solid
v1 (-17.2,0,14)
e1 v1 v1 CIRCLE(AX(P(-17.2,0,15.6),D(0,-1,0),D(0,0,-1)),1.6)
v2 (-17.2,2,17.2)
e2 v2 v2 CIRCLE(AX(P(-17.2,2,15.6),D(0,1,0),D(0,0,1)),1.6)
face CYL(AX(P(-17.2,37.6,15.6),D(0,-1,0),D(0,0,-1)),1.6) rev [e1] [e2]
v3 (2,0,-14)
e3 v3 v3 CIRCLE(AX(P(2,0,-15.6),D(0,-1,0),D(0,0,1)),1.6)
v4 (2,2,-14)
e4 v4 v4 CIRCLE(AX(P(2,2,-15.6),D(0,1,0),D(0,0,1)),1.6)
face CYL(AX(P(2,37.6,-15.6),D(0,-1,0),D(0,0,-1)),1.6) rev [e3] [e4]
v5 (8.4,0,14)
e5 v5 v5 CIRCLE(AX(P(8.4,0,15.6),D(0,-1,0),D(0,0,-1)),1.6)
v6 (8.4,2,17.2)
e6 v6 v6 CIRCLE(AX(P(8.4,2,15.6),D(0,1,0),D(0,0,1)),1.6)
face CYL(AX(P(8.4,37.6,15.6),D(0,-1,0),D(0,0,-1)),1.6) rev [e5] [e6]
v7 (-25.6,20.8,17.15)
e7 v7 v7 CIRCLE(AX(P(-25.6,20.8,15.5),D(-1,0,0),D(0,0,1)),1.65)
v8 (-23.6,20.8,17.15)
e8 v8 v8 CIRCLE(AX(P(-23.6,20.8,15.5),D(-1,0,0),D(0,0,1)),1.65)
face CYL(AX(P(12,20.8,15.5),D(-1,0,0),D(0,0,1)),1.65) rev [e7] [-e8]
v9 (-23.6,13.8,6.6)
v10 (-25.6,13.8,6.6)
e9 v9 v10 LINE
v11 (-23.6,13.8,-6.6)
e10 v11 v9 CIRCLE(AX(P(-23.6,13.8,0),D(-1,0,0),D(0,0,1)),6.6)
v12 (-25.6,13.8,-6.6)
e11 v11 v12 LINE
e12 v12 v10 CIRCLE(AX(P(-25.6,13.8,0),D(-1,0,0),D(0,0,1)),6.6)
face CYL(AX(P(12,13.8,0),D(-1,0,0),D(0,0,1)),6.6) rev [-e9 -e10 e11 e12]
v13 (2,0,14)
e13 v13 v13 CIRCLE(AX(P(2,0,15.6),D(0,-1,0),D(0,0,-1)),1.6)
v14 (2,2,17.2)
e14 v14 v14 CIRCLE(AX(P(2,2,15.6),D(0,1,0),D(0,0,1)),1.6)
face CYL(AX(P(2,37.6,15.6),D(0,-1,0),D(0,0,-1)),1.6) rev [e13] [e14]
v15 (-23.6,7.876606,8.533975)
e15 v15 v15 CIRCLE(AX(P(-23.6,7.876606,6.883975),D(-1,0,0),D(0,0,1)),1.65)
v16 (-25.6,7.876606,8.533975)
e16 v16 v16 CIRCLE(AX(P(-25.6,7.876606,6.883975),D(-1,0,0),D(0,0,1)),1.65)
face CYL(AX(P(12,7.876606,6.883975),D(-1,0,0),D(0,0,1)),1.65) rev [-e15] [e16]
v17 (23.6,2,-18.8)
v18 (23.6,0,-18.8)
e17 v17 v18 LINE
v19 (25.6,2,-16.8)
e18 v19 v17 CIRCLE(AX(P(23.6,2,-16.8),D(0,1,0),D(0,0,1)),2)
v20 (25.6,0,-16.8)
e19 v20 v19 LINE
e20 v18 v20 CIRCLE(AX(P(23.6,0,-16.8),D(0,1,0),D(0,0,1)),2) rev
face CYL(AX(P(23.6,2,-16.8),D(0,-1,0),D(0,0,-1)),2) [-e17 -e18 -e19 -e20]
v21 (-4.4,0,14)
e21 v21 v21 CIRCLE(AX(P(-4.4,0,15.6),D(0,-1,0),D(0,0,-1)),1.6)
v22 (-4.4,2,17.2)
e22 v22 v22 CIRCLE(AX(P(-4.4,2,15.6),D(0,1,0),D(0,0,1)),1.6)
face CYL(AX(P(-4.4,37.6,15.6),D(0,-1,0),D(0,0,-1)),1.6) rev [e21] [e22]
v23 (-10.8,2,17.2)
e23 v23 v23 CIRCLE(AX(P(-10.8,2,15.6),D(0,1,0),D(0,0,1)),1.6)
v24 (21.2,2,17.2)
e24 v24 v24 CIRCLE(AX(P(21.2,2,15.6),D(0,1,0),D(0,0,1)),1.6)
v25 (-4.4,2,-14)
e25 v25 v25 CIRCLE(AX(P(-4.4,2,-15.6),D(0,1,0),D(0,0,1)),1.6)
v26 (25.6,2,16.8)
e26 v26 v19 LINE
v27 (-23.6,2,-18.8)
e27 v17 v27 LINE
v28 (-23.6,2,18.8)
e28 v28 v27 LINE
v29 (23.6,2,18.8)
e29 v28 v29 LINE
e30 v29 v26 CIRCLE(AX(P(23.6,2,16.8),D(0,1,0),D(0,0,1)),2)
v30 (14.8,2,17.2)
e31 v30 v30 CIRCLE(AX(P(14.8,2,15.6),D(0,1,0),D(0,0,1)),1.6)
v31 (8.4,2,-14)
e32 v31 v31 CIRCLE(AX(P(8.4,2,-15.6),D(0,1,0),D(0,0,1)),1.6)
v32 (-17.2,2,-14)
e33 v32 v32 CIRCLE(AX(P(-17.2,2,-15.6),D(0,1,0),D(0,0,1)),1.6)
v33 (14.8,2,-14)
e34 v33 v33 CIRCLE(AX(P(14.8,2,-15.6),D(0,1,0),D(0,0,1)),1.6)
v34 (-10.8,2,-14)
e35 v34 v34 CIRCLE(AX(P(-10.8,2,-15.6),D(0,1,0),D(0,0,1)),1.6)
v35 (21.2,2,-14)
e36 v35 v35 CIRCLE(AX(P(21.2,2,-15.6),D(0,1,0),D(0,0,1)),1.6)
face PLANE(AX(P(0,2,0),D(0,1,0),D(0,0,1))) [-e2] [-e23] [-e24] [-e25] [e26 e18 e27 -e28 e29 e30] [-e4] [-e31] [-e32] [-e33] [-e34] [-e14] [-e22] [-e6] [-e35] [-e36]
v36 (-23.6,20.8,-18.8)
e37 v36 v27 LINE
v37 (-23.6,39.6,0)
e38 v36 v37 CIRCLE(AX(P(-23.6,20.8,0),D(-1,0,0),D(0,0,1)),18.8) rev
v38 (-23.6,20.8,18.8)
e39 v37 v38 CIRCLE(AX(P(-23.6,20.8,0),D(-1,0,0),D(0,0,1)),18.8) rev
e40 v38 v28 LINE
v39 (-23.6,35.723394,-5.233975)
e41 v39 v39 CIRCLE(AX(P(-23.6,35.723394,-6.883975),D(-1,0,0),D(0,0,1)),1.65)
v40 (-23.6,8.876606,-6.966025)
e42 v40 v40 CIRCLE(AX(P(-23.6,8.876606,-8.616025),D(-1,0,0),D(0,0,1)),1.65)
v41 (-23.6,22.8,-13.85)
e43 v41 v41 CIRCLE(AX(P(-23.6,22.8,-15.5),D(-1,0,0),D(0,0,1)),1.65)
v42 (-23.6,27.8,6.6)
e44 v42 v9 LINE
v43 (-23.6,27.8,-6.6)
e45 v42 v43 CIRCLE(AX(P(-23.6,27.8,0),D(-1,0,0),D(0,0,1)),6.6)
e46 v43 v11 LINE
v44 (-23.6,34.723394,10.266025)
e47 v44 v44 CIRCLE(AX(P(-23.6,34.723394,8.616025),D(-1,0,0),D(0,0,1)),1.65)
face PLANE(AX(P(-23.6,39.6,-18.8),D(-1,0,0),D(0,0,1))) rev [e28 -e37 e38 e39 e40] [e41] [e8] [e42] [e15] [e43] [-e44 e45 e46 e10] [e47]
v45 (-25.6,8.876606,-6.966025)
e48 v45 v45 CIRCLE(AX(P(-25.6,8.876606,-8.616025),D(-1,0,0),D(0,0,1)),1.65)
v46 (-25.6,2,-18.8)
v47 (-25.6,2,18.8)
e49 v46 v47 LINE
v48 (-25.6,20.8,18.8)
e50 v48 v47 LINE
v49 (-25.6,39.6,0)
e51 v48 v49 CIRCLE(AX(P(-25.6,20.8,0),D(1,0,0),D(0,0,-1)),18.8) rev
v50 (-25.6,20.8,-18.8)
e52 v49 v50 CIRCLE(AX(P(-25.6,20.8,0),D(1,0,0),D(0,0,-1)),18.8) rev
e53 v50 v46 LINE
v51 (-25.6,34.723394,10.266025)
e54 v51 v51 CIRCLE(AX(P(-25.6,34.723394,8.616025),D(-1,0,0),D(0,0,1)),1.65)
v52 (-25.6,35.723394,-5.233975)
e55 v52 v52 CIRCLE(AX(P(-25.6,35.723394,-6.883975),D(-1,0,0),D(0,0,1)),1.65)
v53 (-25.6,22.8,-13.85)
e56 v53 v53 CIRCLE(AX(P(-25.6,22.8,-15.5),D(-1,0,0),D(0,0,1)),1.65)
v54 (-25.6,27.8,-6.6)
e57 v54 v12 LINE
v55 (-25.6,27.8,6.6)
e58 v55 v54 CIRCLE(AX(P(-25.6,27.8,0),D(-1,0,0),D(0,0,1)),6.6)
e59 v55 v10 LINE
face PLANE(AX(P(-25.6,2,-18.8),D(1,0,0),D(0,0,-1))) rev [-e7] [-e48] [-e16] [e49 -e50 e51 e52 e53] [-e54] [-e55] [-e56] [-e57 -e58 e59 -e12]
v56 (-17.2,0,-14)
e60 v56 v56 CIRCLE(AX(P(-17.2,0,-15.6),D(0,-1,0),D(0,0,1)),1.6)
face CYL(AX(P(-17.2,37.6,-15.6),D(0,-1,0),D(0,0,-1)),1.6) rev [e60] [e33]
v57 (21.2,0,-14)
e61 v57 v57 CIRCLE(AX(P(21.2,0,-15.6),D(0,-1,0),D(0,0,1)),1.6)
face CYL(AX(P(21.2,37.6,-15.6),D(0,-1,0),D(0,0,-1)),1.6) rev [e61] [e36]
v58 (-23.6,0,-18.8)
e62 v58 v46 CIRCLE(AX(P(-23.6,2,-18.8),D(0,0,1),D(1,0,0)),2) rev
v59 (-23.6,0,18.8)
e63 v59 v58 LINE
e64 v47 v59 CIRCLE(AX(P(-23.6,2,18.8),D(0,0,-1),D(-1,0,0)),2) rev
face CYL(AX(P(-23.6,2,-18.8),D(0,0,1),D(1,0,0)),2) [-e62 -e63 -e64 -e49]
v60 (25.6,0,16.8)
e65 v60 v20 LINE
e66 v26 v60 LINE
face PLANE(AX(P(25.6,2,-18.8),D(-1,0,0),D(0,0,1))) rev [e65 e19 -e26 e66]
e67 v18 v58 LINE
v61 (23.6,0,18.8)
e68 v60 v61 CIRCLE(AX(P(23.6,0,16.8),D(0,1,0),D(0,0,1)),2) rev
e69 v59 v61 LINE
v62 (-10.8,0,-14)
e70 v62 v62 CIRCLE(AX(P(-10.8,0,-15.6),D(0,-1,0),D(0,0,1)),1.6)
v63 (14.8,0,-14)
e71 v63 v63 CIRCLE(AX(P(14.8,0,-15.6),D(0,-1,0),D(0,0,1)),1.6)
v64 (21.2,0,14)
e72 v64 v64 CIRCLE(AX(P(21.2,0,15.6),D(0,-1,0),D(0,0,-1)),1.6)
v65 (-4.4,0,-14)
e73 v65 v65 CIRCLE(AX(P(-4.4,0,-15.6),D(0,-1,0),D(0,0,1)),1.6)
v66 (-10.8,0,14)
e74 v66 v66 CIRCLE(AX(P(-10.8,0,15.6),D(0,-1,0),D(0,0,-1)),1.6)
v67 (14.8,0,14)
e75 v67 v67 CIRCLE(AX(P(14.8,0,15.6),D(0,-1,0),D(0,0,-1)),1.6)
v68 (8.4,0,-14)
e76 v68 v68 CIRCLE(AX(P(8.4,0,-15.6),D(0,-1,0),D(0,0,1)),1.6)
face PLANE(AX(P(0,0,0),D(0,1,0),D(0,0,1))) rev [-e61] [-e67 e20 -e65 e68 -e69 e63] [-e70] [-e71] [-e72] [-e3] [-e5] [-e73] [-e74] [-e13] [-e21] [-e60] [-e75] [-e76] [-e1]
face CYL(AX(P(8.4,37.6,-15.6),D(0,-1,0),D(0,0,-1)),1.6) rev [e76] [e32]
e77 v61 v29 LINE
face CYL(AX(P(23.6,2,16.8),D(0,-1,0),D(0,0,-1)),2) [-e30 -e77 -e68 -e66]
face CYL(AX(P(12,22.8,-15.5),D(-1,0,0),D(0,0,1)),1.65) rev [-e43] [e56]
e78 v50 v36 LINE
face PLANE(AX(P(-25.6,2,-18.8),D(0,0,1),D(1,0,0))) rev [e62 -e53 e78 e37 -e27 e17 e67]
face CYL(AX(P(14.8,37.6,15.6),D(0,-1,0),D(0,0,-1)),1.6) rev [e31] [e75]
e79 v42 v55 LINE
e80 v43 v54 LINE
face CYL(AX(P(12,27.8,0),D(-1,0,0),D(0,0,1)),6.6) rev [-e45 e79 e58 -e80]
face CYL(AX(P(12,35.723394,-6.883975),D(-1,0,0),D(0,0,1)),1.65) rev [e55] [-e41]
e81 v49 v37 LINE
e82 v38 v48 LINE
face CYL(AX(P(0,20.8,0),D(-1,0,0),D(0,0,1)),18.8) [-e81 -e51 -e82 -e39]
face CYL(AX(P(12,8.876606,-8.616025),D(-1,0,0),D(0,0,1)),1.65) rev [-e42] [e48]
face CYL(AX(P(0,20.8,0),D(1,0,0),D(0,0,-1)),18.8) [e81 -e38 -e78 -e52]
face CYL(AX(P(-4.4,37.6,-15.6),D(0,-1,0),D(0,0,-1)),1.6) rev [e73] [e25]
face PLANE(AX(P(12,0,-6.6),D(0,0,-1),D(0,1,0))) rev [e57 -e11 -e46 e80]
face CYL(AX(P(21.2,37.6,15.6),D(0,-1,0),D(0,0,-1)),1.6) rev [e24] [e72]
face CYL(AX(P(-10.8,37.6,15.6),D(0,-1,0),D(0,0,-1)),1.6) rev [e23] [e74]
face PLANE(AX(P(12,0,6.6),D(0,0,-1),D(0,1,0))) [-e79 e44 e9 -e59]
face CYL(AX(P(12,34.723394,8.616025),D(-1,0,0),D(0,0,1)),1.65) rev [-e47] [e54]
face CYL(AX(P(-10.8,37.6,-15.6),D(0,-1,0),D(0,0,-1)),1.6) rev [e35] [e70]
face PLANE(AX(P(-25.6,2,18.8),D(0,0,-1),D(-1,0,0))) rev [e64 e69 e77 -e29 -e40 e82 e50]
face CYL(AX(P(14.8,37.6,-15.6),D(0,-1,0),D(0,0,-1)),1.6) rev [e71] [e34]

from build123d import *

# Parameters (mm, degrees)
SKETCH1_W           = 51.2
SKETCH1_H           = 37.6
BOSS_EXTRUDE1_DEPTH = 2
SKETCH2_W           = 2
SKETCH2_H           = 37.6
BOSS_EXTRUDE2_DEPTH = 37.6
SKETCH3_R           = 1.65
CUT_EXTRUDE2_DEPTH  = 37.6
SKETCH5_R           = 6.6
CUT_EXTRUDE3_DEPTH  = 37.6
SKETCH6_R           = 1.6
CUT_EXTRUDE4_DEPTH  = 37.6
FILLET1_R           = 2
FILLET2_R           = 2
FILLET3_R           = 18.8


with BuildPart() as part:
    # Sketch1 → Boss-Extrude1 (new body)
    with BuildSketch(Plane(origin=(0, 0, 0), x_dir=(1, 0, 0), z_dir=(0, 1, 0))):
        Rectangle(SKETCH1_W, SKETCH1_H)
    extrude(amount=BOSS_EXTRUDE1_DEPTH)

    # Sketch2 → Boss-Extrude2 (add)
    with BuildSketch(Plane(origin=(0, 2, 0), x_dir=(1, 0, 0), z_dir=(0, 1, 0))):
        with Locations((-24.6, 0)):
            Rectangle(SKETCH2_W, SKETCH2_H)
    extrude(amount=BOSS_EXTRUDE2_DEPTH)

    # Sketch3 → Cut-Extrude2 (cut)
    with BuildSketch(Plane.ZY.offset(25.6)):
        with Locations((15.5, 20.8)):
            Circle(SKETCH3_R)
        with Locations((6.883974596, 7.876606241)):
            Circle(SKETCH3_R)
        with Locations((-8.616025404, 8.876606241)):
            Circle(SKETCH3_R)
        with Locations((-15.5, 22.8)):
            Circle(SKETCH3_R)
        with Locations((-6.883974596, 35.723393759)):
            Circle(SKETCH3_R)
        with Locations((8.616025404, 34.723393759)):
            Circle(SKETCH3_R)
    extrude(amount=-CUT_EXTRUDE2_DEPTH, mode=Mode.SUBTRACT)

    # Sketch5 → Cut-Extrude3 (cut)
    with BuildSketch(Plane.ZY.offset(25.6)):
        with Locations((0, 27.8)):
            Circle(SKETCH5_R)
        with BuildLine():
            Line((6.6, 13.8), (6.6, 27.8))
            ThreePointArc((6.6, 27.8), (0, 21.2), (-6.6, 27.8))
            Line((-6.6, 27.8), (-6.6, 13.8))
            ThreePointArc((-6.6, 13.8), (0, 20.4), (6.6, 13.8))
        make_face()
        with Locations((0, 13.8)):
            Circle(SKETCH5_R)
    extrude(amount=-CUT_EXTRUDE3_DEPTH, mode=Mode.SUBTRACT)

    # Sketch6 → Cut-Extrude4 (cut)
    with BuildSketch(Plane(origin=(0, 0, 0), x_dir=(-1, 0, 0), z_dir=(0, -1, 0))):
        with Locations(Location((17.2, -15.6, 0), (0, 0, 90))):
            Circle(SKETCH6_R)
        with Locations(Location((10.8, -15.6, 0), (0, 0, 90))):
            Circle(SKETCH6_R)
        with Locations(Location((4.4, -15.6, 0), (0, 0, 90))):
            Circle(SKETCH6_R)
        with Locations(Location((-2, -15.6, 0), (0, 0, 90))):
            Circle(SKETCH6_R)
        with Locations(Location((-8.4, -15.6, 0), (0, 0, 90))):
            Circle(SKETCH6_R)
        with Locations(Location((-14.8, -15.6, 0), (0, 0, 90))):
            Circle(SKETCH6_R)
        with Locations(Location((-21.2, -15.6, 0), (0, 0, 90))):
            Circle(SKETCH6_R)
        with Locations(Location((-21.2, 15.6, 0), (0, 0, 270))):
            Circle(SKETCH6_R)
        with Locations(Location((-14.8, 15.6, 0), (0, 0, 270))):
            Circle(SKETCH6_R)
        with Locations(Location((-8.4, 15.6, 0), (0, 0, 270))):
            Circle(SKETCH6_R)
        with Locations(Location((-2, 15.6, 0), (0, 0, 270))):
            Circle(SKETCH6_R)
        with Locations(Location((4.4, 15.6, 0), (0, 0, 270))):
            Circle(SKETCH6_R)
        with Locations(Location((10.8, 15.6, 0), (0, 0, 270))):
            Circle(SKETCH6_R)
        with Locations(Location((17.2, 15.6, 0), (0, 0, 270))):
            Circle(SKETCH6_R)
    extrude(amount=-CUT_EXTRUDE4_DEPTH, mode=Mode.SUBTRACT)

    # Fillet1
    fillet1_edges = [part.edges().sort_by_distance(p)[0] for p in [
        (25.6, 1, -18.8),
        (25.6, 1, 18.8),
    ]]
    fillet(fillet1_edges, radius=FILLET1_R)

    # Fillet2
    fillet2_edges = [part.edges().sort_by_distance(p)[0] for p in [
        (-25.6, 0, 0),
    ]]
    fillet(fillet2_edges, radius=FILLET2_R)

    # Fillet3
    fillet3_edges = [part.edges().sort_by_distance(p)[0] for p in [
        (-24.6, 39.6, -18.8),
        (-24.6, 39.6, 18.8),
    ]]
    fillet(fillet3_edges, radius=FILLET3_R - 0.0001)  # a hair under: the kernel refuses the full size


solid = part.part
